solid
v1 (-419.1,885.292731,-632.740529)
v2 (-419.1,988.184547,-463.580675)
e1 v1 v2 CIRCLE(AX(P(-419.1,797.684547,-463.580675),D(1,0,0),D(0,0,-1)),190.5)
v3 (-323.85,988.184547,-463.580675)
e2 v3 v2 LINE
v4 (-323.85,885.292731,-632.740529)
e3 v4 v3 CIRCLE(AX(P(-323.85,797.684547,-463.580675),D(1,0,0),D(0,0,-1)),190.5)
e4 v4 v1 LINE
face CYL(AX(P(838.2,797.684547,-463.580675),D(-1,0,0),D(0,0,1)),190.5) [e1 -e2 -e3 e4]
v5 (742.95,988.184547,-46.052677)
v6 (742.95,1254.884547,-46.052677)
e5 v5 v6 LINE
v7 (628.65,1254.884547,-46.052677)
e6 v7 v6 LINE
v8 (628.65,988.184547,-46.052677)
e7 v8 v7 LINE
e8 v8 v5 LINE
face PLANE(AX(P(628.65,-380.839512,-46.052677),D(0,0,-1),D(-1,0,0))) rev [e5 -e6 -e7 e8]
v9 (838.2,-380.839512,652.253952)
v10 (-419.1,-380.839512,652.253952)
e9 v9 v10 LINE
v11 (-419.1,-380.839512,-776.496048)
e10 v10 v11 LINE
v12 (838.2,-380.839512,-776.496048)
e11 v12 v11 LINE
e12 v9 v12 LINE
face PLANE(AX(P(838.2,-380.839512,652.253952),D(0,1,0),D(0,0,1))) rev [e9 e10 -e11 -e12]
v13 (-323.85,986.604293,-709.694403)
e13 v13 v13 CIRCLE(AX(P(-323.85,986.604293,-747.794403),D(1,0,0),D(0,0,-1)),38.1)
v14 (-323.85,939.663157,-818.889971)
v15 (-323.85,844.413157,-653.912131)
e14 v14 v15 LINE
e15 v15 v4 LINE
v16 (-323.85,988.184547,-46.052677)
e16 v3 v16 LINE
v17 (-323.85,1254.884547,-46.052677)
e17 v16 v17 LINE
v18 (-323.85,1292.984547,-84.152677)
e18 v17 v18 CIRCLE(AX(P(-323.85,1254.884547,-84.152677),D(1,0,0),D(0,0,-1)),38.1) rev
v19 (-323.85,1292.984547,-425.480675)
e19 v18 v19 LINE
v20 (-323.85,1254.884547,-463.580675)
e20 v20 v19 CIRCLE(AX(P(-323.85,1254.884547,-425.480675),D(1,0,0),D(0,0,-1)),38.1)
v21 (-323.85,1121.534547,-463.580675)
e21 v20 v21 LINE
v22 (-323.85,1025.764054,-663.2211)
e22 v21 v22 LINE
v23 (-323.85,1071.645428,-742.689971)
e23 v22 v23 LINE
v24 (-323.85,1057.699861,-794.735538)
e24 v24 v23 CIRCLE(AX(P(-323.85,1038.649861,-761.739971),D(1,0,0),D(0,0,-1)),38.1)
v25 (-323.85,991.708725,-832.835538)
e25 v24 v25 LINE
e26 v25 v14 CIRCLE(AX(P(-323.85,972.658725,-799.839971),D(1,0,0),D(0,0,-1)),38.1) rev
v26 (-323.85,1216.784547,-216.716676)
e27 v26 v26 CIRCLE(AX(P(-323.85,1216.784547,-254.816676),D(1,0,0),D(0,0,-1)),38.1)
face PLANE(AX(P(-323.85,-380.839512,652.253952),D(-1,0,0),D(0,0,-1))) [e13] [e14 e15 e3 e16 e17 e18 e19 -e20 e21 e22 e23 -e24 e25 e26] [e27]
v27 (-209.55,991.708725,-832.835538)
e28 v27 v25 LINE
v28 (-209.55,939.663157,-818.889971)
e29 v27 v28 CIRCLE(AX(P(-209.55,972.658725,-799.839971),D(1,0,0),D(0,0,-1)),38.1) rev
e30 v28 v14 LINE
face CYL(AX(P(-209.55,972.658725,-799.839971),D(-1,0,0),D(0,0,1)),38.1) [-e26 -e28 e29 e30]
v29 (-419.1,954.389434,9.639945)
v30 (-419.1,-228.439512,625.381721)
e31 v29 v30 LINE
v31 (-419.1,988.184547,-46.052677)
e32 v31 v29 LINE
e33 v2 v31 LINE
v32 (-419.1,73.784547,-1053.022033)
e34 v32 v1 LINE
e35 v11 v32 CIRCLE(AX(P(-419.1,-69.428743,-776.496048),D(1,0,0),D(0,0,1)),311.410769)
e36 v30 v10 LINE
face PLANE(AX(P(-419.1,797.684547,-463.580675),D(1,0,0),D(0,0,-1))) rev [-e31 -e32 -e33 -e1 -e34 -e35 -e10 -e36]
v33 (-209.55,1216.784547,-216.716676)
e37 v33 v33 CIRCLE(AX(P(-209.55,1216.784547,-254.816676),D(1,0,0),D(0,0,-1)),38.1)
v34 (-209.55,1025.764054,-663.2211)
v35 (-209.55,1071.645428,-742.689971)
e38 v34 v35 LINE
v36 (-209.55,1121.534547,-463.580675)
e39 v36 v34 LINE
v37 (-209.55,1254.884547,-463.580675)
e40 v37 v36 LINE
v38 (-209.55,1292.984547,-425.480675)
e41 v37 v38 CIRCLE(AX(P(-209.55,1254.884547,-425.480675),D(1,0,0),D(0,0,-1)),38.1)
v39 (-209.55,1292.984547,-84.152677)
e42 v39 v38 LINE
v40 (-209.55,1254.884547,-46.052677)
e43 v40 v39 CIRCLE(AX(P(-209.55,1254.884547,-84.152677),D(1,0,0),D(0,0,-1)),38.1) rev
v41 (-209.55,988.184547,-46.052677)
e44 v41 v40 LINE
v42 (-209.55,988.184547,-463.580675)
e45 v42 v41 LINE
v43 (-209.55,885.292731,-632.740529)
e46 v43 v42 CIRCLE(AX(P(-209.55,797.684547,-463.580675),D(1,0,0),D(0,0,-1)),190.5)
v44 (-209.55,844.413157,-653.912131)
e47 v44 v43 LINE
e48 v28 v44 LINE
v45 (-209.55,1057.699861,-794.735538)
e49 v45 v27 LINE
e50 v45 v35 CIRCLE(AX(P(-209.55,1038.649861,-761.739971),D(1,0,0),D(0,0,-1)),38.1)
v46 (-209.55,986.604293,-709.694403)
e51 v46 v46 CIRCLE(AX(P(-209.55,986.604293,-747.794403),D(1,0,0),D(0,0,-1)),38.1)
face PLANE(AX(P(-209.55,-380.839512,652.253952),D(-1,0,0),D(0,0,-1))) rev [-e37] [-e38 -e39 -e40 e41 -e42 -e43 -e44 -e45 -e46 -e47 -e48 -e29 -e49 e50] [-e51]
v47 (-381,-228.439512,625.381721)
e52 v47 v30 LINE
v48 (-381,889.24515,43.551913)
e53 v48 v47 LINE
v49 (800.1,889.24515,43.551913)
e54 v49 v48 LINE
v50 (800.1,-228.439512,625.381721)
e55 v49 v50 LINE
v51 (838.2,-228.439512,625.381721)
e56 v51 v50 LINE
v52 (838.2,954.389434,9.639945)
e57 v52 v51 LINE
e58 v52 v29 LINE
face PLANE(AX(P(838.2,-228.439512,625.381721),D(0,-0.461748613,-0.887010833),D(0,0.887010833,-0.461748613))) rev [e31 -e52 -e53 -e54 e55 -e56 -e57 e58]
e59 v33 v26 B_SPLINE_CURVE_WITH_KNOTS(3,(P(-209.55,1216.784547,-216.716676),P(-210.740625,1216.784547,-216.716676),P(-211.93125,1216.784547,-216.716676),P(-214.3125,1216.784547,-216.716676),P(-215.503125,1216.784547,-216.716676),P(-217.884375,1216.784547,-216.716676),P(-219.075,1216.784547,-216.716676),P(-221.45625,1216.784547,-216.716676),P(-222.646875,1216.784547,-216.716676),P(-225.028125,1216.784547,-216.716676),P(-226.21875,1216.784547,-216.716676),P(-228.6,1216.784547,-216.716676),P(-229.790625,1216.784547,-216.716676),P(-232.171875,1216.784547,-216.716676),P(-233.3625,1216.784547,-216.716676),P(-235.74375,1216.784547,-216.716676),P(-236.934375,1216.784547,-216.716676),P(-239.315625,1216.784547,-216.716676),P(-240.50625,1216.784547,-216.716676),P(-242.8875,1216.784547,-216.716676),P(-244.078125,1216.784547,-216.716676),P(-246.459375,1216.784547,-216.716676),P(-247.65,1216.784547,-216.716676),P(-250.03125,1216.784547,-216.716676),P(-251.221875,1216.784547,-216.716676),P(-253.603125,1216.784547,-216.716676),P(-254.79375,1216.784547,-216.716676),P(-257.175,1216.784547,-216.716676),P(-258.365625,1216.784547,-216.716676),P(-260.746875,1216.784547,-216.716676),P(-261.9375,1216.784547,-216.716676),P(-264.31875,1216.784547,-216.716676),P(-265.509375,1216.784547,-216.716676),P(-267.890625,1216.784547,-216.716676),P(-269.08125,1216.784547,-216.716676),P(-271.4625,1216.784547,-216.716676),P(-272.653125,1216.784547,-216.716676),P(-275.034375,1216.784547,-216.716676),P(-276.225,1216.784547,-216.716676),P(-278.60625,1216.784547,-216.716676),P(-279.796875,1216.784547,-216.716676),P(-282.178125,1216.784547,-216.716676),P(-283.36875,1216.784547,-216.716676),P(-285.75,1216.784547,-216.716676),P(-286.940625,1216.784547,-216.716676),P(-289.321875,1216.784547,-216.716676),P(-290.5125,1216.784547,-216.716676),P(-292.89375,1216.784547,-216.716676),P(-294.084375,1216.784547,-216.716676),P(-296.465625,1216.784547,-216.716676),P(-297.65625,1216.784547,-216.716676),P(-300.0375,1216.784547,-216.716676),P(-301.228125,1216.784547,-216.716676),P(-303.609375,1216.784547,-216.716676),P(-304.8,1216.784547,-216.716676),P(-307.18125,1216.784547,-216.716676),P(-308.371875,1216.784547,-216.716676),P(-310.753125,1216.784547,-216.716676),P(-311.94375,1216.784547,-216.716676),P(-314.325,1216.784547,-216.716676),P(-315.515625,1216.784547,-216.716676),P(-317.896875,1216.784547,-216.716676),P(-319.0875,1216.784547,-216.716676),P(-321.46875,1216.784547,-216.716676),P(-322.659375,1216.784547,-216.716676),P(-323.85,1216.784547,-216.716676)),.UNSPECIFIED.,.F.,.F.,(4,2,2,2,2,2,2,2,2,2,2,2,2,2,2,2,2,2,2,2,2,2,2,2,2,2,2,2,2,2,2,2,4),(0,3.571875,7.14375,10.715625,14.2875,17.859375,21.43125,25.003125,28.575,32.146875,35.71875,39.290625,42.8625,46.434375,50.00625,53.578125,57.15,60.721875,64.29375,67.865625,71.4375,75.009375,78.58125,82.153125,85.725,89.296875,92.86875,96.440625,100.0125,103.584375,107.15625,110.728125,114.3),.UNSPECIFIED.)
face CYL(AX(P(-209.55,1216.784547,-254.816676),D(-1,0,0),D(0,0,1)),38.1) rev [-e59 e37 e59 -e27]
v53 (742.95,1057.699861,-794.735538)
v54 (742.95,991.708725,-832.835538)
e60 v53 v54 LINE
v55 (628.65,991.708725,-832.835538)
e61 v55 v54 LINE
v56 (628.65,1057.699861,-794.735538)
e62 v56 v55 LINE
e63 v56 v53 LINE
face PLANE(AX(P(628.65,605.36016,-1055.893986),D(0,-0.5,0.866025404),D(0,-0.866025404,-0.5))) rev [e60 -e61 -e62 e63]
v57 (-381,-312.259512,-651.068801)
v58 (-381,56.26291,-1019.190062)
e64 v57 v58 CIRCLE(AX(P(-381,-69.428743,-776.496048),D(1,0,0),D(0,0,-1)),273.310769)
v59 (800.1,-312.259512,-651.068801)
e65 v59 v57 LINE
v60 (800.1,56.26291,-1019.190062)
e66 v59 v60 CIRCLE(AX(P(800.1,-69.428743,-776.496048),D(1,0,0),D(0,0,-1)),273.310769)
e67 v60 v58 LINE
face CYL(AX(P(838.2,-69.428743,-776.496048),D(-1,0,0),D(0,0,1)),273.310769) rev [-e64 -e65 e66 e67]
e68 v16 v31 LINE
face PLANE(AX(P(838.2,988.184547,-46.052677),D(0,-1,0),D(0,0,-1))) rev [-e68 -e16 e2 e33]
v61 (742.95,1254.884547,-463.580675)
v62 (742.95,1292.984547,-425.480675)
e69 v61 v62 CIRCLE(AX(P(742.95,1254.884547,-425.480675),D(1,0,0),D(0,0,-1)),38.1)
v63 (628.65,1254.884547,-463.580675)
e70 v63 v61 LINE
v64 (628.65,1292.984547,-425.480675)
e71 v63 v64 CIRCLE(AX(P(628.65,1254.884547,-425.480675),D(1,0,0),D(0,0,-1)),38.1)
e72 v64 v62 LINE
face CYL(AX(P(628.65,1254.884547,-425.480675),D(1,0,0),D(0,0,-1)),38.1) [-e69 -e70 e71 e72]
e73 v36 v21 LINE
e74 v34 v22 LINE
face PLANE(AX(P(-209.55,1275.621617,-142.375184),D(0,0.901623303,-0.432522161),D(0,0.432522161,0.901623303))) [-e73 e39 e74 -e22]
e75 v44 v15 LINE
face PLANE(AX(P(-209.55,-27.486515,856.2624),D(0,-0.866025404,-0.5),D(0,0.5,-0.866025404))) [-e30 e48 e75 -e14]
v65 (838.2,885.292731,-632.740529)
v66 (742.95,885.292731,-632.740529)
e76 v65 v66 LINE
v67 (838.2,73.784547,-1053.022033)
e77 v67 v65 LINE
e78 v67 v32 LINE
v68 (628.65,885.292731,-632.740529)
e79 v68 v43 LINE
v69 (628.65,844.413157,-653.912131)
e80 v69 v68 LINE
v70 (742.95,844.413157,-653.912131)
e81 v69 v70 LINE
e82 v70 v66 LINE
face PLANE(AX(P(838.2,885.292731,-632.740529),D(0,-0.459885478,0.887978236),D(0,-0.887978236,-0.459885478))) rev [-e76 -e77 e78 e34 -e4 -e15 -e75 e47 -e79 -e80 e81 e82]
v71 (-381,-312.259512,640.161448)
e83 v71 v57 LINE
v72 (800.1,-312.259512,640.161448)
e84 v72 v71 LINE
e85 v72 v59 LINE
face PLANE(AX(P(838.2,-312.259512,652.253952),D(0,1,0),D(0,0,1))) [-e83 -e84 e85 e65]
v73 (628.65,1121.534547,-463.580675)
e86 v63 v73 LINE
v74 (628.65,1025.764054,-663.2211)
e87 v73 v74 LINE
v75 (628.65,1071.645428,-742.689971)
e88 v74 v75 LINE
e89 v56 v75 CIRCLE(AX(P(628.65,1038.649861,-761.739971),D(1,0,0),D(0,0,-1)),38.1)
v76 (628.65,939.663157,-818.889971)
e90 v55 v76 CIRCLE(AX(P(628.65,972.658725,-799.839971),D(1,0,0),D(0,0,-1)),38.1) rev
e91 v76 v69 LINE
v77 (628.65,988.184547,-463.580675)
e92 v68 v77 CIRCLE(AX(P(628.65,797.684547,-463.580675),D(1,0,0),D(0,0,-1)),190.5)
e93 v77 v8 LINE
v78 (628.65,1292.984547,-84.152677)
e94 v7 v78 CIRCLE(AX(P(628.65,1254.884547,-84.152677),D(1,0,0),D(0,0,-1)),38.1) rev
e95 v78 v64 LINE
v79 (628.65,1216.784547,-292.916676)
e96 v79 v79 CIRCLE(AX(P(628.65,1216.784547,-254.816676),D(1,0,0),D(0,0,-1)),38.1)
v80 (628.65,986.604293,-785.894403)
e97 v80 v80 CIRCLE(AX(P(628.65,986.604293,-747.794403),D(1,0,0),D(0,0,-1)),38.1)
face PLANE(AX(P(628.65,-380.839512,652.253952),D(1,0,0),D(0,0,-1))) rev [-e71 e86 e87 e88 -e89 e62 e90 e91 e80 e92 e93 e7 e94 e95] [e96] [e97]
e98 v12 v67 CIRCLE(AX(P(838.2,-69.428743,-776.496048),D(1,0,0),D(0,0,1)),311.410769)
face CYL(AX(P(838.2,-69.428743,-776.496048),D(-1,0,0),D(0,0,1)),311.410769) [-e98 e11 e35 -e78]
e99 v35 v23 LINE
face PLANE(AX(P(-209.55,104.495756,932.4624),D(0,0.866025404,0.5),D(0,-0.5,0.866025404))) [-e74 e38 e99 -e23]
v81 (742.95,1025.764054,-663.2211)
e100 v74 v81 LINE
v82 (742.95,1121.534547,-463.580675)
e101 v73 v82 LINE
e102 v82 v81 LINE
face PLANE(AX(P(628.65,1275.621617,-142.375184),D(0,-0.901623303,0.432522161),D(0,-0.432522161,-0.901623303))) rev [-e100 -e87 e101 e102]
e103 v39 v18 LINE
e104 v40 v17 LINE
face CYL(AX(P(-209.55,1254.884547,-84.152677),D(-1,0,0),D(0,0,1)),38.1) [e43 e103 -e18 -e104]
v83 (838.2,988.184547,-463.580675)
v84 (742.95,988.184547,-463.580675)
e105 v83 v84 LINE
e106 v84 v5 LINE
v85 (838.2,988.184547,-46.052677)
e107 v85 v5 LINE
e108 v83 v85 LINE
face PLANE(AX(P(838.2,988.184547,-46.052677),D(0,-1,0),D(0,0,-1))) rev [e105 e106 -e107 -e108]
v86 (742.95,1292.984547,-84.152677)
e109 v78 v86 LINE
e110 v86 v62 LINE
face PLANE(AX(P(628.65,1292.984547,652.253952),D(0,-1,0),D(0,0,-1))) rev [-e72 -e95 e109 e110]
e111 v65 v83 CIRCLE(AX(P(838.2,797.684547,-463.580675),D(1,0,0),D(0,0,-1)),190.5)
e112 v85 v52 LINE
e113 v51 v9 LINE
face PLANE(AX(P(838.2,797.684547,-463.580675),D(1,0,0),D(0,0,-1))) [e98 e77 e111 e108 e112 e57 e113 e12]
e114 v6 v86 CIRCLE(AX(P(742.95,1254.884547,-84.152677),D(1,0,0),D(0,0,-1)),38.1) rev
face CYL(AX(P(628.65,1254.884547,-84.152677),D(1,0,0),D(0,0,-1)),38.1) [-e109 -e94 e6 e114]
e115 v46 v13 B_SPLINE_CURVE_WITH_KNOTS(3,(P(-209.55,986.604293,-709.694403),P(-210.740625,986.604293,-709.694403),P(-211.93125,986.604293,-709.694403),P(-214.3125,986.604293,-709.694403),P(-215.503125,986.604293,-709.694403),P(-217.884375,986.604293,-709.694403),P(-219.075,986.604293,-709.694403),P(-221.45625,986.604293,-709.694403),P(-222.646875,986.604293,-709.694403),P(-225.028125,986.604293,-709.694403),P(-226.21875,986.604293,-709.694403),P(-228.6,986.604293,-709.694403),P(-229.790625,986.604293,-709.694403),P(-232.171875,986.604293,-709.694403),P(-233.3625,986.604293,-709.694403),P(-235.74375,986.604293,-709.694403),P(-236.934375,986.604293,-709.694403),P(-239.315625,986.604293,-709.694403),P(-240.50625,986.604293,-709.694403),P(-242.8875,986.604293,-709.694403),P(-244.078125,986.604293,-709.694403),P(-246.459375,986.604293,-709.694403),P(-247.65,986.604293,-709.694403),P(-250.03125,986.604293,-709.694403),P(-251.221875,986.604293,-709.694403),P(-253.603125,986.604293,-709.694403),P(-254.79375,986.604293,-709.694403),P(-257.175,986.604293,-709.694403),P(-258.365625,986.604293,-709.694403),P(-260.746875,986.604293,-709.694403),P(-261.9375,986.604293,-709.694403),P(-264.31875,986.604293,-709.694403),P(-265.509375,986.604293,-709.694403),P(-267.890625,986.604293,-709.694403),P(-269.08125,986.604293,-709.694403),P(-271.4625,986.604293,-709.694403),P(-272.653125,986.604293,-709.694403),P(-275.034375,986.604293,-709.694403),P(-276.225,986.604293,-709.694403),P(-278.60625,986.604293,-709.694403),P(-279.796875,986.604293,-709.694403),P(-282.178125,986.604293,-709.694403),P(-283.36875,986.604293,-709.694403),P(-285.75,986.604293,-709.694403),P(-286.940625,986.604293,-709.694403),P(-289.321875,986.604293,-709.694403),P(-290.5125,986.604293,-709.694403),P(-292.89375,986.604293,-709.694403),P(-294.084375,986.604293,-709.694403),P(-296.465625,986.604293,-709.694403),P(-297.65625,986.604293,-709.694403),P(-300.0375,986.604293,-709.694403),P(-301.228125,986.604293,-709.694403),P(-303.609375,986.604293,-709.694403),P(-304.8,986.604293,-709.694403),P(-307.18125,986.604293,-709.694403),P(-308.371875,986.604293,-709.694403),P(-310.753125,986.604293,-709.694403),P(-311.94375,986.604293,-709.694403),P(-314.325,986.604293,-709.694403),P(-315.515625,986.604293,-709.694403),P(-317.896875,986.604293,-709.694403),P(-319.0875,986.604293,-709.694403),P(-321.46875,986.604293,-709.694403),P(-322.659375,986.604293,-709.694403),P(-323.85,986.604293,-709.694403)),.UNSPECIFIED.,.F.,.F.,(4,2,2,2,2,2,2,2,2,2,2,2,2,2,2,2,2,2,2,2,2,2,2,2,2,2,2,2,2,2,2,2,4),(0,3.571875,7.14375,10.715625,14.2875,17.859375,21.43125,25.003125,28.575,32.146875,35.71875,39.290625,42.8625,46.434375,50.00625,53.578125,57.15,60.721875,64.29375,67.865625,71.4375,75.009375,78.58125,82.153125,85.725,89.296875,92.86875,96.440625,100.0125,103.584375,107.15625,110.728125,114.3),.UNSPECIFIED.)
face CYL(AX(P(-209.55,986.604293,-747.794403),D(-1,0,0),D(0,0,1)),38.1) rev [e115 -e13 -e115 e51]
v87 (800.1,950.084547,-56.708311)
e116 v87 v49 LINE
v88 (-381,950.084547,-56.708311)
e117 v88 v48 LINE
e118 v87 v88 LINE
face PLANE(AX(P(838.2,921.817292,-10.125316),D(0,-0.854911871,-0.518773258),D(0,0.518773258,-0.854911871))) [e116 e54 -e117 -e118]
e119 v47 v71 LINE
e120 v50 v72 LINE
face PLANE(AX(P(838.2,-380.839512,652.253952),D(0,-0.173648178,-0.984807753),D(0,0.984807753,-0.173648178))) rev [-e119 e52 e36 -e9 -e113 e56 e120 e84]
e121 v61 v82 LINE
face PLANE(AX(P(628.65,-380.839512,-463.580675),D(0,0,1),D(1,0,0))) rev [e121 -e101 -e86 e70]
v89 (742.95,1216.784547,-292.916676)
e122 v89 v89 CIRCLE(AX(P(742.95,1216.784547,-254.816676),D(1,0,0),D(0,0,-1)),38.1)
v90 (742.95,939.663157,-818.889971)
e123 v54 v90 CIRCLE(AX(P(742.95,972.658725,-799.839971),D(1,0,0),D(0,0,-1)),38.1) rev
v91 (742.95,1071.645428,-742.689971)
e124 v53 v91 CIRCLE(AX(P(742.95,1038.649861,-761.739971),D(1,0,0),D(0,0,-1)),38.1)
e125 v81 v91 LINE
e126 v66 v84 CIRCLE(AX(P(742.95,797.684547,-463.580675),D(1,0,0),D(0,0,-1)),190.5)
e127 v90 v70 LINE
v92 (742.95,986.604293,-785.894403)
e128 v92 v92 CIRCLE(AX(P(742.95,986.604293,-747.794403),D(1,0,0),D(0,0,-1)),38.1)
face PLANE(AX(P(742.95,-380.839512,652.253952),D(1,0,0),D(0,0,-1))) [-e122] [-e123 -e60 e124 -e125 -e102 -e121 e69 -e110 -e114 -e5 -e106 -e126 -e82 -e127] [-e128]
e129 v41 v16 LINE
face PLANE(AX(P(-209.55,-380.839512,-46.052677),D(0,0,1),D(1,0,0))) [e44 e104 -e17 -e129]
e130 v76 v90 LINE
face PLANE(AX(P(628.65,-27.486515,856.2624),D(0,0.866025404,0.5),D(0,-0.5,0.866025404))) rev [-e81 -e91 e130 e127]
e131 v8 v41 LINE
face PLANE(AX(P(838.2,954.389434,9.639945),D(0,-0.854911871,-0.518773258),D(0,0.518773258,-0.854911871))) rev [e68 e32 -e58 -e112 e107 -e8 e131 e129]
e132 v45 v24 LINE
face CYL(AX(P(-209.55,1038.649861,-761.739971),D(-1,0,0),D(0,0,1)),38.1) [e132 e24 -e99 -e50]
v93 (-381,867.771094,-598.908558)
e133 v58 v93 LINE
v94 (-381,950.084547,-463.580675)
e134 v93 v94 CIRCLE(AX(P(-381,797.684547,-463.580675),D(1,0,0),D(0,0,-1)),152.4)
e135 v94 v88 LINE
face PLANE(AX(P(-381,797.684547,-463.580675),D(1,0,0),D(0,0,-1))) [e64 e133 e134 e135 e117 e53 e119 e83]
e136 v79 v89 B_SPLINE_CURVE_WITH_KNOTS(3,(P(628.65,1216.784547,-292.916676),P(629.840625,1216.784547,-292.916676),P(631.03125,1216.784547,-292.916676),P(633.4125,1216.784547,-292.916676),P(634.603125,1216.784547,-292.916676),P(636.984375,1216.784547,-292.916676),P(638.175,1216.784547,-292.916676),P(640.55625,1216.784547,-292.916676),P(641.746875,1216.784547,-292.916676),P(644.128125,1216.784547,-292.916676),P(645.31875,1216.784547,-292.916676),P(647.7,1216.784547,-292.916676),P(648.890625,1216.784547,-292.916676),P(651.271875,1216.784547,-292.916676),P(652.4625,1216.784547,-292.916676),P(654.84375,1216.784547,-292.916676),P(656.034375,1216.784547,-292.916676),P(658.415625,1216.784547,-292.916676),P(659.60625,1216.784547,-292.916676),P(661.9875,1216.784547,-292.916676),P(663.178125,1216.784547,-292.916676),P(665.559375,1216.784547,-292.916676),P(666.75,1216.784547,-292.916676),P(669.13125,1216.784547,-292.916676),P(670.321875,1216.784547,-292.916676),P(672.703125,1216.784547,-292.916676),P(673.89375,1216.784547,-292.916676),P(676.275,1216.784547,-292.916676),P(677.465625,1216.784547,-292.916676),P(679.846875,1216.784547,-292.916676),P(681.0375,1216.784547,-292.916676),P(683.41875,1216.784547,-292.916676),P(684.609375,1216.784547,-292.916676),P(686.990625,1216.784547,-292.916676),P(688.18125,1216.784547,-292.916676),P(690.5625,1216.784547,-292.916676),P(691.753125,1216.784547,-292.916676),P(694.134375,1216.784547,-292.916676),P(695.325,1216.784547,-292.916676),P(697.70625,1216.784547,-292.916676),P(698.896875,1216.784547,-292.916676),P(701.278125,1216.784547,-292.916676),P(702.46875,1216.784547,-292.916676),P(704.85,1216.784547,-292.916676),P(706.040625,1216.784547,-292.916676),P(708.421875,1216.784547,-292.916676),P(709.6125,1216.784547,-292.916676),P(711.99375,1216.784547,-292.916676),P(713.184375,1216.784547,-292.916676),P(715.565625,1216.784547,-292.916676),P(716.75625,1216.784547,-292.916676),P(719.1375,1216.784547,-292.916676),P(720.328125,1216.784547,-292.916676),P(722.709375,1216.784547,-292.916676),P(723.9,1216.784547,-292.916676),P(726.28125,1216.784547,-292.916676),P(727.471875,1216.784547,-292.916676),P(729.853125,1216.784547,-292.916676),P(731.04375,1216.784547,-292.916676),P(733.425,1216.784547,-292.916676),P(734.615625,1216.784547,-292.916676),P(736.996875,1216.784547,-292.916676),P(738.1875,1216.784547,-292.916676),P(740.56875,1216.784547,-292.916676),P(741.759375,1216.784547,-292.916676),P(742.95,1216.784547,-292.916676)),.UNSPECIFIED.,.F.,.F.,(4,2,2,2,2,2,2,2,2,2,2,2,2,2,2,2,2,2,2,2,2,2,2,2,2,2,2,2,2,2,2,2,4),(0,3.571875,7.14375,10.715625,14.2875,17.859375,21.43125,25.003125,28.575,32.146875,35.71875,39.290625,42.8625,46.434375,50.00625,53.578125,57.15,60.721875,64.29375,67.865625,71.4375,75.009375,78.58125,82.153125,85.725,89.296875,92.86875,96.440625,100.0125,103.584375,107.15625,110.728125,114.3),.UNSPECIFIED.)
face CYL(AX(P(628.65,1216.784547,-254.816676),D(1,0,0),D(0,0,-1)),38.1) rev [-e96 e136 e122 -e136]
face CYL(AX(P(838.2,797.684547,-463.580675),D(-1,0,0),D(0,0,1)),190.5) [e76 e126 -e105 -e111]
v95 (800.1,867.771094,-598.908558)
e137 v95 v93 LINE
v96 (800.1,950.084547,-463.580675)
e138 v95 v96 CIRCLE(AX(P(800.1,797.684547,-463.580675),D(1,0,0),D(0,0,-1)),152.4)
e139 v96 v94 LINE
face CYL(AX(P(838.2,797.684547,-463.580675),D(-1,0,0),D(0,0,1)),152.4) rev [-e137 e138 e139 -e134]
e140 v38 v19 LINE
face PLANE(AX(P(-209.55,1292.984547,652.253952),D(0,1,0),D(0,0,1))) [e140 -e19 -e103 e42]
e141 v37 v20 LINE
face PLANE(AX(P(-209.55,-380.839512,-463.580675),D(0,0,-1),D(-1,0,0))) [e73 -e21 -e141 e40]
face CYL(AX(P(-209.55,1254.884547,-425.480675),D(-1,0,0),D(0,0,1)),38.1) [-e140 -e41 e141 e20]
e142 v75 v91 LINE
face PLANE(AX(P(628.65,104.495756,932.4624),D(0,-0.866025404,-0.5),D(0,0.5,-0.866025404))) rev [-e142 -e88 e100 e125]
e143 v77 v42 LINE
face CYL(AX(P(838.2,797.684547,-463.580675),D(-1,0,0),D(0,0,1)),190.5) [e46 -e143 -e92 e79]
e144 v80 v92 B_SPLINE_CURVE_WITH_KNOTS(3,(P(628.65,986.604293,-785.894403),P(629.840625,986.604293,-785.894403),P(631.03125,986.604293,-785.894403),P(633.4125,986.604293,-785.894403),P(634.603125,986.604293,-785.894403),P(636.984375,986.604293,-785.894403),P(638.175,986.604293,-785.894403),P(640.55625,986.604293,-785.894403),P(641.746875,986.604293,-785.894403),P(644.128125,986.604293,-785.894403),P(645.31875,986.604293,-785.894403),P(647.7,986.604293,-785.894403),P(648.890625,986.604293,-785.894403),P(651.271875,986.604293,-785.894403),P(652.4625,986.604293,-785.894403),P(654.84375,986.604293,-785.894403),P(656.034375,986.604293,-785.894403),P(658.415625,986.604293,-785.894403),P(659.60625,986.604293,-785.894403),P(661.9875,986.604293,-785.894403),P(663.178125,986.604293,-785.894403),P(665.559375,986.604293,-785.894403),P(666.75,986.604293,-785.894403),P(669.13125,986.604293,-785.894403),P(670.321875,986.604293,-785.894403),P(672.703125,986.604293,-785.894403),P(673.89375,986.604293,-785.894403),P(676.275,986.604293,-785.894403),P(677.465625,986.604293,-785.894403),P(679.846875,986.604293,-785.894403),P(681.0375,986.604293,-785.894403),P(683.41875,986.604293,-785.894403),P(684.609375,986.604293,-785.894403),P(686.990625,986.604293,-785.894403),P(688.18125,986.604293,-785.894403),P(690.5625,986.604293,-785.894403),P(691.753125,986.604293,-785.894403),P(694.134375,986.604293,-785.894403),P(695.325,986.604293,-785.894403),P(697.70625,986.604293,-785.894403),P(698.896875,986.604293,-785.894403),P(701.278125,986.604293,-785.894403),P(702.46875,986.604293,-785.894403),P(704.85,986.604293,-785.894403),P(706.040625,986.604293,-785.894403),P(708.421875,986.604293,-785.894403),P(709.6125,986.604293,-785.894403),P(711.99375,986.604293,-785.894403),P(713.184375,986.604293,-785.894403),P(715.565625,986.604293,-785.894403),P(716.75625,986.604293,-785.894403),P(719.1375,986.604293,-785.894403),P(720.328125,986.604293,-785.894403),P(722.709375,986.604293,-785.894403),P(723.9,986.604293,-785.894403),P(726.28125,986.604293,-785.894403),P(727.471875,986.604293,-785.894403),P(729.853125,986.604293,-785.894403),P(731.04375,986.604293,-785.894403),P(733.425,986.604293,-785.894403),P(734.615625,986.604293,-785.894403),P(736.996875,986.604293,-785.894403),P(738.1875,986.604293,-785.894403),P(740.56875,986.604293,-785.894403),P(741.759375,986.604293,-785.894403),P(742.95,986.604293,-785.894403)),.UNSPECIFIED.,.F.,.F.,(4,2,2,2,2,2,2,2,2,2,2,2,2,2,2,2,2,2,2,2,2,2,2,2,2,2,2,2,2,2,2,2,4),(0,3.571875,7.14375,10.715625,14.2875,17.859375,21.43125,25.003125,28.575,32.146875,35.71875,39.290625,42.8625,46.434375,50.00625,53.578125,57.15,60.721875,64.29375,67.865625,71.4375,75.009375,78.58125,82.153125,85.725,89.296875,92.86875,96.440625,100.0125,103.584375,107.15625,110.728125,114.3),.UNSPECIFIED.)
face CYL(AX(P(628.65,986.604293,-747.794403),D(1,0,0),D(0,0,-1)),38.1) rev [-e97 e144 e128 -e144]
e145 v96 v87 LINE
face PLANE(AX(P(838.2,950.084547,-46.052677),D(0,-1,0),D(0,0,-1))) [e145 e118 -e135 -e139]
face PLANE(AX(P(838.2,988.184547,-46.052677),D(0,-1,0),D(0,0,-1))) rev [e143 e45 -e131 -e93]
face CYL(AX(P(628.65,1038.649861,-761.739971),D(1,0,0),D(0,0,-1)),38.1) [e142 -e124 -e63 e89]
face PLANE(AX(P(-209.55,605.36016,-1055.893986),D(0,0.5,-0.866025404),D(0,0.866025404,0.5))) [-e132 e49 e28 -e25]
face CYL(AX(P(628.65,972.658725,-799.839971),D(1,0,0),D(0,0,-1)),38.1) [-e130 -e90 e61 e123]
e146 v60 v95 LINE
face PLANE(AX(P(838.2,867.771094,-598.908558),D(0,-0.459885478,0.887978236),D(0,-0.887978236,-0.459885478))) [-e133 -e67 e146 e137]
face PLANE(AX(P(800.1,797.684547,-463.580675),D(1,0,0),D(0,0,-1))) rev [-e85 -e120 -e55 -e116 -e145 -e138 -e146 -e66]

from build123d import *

# Parameters (mm, degrees)
BOSS_EXTRUDE1_DEPTH = 419.1
SHELL1_START        = 12.7
SHELL1_DEPTH        = 393.7
BOSS_EXTRUDE3_START = -69.85
SKETCH3_R           = 12.7
BOSS_EXTRUDE3_DEPTH = 38.1
SCALE3_SCALE        = 3


# Read off the part's stored shape, not the designer's step: Shell1
with BuildPart() as part:
    # Sketch1 → Boss-Extrude1 (new body)
    with BuildSketch(Plane(origin=(0, 0, 0), x_dir=(0, 0, -1), z_dir=(1, 0, 0))):
        with BuildLine():
            Line((0, 0), (476.25, 0))
            ThreePointArc((476.25, 0), (564.93634732, 49.85994299), (568.425328349, 151.541352929))
            Line((568.425328349, 151.541352929), (428.331493685, 422.044080755))
            ThreePointArc((428.331493685, 422.044080755), (404.943942228, 447.093648811), (371.944875703, 456.341352929))
            Line((371.944875703, 456.341352929), (232.768876591, 456.341352929))
            Line((232.768876591, 456.341352929), (214.204669203, 445.076315348))
            Line((214.204669203, 445.076315348), (8.95741062, 50.8))
            Line((8.95741062, 50.8), (0, 0))
        make_face()
    extrude(amount=BOSS_EXTRUDE1_DEPTH)

    # Shell1 outline → Shell1 (cut)
    with BuildSketch(Plane.YZ.offset(SHELL1_START)):
        with BuildLine():
            Line((22.86, -4.030834779), (22.86, -434.440917972))
            ThreePointArc((22.86, -434.440917972), (39.418714995, -540.70503827), (145.700807364, -557.148004752))
            Line((145.700807364, -557.148004752), (416.20353519, -417.054170089))
            ThreePointArc((416.20353519, -417.054170089), (436.243189635, -398.344128923), (443.641352929, -371.944875703))
            Line((443.641352929, -371.944875703), (443.641352929, -236.320754436))
            Line((443.641352929, -236.320754436), (423.361553833, -202.900679848))
            Line((423.361553833, -202.900679848), (50.8, -8.95741062))
            Line((50.8, -8.95741062), (22.86, -4.030834779))
        make_face()
    extrude(amount=SHELL1_DEPTH, mode=Mode.SUBTRACT)

    # Sketch3 → Boss-Extrude3 (add)
    with BuildSketch(Plane(origin=(419.1, 0, 0), x_dir=(0, 0, -1), z_dir=(1, 0, 0)).offset(BOSS_EXTRUDE3_START)):
        with BuildLine():
            Line((232.768876591, 545.241352929), (232.768876591, 456.341352929))
            Line((232.768876591, 456.341352929), (371.944875703, 456.341352929))
            ThreePointArc((371.944875703, 456.341352929), (404.943942228, 447.093648811), (428.331493685, 422.044080755))
            Line((428.331493685, 422.044080755), (435.388694544, 408.417556164))
            Line((435.388694544, 408.417556164), (490.381307684, 440.167556164))
            ThreePointArc((490.381307684, 440.167556164), (496.298565678, 447.879076919), (495.029830312, 457.516078792))
            Line((495.029830312, 457.516078792), (482.329830312, 479.513124048))
            ThreePointArc((482.329830312, 479.513124048), (474.618309557, 485.430382042), (464.981307684, 484.161646676))
            Line((464.981307684, 484.161646676), (438.491684026, 468.867855326))
            Line((438.491684026, 468.867855326), (371.944875703, 500.791352929))
            Line((371.944875703, 500.791352929), (371.944875703, 545.241352929))
            ThreePointArc((371.944875703, 545.241352929), (368.225131824, 554.22160905), (359.244875703, 557.941352929))
            Line((359.244875703, 557.941352929), (245.468876591, 557.941352929))
            ThreePointArc((245.468876591, 557.941352929), (236.48862047, 554.22160905), (232.768876591, 545.241352929))
        make_face()
        with Locations((302.356876147, 532.541352929)):
            Circle(SKETCH3_R, mode=Mode.SUBTRACT)
        with Locations((466.682785056, 455.81460142)):
            Circle(SKETCH3_R, mode=Mode.SUBTRACT)
    boss_extrude3 = extrude(amount=BOSS_EXTRUDE3_DEPTH)

    # Mirror1: Boss-Extrude3 across plane
    add(boss_extrude3.mirror(Plane(origin=(209.55, 0, 0), x_dir=(0, 0, 1), z_dir=(1, 0, 0))))


with BuildPart() as part_1:
    # Scale3: scaled about (209.55, 190.419755822, -326.126976247)
    add(part.part.scale(SCALE3_SCALE).moved(Location((-419.1, -380.839511644, 652.253952494))))


solid = part_1.part
